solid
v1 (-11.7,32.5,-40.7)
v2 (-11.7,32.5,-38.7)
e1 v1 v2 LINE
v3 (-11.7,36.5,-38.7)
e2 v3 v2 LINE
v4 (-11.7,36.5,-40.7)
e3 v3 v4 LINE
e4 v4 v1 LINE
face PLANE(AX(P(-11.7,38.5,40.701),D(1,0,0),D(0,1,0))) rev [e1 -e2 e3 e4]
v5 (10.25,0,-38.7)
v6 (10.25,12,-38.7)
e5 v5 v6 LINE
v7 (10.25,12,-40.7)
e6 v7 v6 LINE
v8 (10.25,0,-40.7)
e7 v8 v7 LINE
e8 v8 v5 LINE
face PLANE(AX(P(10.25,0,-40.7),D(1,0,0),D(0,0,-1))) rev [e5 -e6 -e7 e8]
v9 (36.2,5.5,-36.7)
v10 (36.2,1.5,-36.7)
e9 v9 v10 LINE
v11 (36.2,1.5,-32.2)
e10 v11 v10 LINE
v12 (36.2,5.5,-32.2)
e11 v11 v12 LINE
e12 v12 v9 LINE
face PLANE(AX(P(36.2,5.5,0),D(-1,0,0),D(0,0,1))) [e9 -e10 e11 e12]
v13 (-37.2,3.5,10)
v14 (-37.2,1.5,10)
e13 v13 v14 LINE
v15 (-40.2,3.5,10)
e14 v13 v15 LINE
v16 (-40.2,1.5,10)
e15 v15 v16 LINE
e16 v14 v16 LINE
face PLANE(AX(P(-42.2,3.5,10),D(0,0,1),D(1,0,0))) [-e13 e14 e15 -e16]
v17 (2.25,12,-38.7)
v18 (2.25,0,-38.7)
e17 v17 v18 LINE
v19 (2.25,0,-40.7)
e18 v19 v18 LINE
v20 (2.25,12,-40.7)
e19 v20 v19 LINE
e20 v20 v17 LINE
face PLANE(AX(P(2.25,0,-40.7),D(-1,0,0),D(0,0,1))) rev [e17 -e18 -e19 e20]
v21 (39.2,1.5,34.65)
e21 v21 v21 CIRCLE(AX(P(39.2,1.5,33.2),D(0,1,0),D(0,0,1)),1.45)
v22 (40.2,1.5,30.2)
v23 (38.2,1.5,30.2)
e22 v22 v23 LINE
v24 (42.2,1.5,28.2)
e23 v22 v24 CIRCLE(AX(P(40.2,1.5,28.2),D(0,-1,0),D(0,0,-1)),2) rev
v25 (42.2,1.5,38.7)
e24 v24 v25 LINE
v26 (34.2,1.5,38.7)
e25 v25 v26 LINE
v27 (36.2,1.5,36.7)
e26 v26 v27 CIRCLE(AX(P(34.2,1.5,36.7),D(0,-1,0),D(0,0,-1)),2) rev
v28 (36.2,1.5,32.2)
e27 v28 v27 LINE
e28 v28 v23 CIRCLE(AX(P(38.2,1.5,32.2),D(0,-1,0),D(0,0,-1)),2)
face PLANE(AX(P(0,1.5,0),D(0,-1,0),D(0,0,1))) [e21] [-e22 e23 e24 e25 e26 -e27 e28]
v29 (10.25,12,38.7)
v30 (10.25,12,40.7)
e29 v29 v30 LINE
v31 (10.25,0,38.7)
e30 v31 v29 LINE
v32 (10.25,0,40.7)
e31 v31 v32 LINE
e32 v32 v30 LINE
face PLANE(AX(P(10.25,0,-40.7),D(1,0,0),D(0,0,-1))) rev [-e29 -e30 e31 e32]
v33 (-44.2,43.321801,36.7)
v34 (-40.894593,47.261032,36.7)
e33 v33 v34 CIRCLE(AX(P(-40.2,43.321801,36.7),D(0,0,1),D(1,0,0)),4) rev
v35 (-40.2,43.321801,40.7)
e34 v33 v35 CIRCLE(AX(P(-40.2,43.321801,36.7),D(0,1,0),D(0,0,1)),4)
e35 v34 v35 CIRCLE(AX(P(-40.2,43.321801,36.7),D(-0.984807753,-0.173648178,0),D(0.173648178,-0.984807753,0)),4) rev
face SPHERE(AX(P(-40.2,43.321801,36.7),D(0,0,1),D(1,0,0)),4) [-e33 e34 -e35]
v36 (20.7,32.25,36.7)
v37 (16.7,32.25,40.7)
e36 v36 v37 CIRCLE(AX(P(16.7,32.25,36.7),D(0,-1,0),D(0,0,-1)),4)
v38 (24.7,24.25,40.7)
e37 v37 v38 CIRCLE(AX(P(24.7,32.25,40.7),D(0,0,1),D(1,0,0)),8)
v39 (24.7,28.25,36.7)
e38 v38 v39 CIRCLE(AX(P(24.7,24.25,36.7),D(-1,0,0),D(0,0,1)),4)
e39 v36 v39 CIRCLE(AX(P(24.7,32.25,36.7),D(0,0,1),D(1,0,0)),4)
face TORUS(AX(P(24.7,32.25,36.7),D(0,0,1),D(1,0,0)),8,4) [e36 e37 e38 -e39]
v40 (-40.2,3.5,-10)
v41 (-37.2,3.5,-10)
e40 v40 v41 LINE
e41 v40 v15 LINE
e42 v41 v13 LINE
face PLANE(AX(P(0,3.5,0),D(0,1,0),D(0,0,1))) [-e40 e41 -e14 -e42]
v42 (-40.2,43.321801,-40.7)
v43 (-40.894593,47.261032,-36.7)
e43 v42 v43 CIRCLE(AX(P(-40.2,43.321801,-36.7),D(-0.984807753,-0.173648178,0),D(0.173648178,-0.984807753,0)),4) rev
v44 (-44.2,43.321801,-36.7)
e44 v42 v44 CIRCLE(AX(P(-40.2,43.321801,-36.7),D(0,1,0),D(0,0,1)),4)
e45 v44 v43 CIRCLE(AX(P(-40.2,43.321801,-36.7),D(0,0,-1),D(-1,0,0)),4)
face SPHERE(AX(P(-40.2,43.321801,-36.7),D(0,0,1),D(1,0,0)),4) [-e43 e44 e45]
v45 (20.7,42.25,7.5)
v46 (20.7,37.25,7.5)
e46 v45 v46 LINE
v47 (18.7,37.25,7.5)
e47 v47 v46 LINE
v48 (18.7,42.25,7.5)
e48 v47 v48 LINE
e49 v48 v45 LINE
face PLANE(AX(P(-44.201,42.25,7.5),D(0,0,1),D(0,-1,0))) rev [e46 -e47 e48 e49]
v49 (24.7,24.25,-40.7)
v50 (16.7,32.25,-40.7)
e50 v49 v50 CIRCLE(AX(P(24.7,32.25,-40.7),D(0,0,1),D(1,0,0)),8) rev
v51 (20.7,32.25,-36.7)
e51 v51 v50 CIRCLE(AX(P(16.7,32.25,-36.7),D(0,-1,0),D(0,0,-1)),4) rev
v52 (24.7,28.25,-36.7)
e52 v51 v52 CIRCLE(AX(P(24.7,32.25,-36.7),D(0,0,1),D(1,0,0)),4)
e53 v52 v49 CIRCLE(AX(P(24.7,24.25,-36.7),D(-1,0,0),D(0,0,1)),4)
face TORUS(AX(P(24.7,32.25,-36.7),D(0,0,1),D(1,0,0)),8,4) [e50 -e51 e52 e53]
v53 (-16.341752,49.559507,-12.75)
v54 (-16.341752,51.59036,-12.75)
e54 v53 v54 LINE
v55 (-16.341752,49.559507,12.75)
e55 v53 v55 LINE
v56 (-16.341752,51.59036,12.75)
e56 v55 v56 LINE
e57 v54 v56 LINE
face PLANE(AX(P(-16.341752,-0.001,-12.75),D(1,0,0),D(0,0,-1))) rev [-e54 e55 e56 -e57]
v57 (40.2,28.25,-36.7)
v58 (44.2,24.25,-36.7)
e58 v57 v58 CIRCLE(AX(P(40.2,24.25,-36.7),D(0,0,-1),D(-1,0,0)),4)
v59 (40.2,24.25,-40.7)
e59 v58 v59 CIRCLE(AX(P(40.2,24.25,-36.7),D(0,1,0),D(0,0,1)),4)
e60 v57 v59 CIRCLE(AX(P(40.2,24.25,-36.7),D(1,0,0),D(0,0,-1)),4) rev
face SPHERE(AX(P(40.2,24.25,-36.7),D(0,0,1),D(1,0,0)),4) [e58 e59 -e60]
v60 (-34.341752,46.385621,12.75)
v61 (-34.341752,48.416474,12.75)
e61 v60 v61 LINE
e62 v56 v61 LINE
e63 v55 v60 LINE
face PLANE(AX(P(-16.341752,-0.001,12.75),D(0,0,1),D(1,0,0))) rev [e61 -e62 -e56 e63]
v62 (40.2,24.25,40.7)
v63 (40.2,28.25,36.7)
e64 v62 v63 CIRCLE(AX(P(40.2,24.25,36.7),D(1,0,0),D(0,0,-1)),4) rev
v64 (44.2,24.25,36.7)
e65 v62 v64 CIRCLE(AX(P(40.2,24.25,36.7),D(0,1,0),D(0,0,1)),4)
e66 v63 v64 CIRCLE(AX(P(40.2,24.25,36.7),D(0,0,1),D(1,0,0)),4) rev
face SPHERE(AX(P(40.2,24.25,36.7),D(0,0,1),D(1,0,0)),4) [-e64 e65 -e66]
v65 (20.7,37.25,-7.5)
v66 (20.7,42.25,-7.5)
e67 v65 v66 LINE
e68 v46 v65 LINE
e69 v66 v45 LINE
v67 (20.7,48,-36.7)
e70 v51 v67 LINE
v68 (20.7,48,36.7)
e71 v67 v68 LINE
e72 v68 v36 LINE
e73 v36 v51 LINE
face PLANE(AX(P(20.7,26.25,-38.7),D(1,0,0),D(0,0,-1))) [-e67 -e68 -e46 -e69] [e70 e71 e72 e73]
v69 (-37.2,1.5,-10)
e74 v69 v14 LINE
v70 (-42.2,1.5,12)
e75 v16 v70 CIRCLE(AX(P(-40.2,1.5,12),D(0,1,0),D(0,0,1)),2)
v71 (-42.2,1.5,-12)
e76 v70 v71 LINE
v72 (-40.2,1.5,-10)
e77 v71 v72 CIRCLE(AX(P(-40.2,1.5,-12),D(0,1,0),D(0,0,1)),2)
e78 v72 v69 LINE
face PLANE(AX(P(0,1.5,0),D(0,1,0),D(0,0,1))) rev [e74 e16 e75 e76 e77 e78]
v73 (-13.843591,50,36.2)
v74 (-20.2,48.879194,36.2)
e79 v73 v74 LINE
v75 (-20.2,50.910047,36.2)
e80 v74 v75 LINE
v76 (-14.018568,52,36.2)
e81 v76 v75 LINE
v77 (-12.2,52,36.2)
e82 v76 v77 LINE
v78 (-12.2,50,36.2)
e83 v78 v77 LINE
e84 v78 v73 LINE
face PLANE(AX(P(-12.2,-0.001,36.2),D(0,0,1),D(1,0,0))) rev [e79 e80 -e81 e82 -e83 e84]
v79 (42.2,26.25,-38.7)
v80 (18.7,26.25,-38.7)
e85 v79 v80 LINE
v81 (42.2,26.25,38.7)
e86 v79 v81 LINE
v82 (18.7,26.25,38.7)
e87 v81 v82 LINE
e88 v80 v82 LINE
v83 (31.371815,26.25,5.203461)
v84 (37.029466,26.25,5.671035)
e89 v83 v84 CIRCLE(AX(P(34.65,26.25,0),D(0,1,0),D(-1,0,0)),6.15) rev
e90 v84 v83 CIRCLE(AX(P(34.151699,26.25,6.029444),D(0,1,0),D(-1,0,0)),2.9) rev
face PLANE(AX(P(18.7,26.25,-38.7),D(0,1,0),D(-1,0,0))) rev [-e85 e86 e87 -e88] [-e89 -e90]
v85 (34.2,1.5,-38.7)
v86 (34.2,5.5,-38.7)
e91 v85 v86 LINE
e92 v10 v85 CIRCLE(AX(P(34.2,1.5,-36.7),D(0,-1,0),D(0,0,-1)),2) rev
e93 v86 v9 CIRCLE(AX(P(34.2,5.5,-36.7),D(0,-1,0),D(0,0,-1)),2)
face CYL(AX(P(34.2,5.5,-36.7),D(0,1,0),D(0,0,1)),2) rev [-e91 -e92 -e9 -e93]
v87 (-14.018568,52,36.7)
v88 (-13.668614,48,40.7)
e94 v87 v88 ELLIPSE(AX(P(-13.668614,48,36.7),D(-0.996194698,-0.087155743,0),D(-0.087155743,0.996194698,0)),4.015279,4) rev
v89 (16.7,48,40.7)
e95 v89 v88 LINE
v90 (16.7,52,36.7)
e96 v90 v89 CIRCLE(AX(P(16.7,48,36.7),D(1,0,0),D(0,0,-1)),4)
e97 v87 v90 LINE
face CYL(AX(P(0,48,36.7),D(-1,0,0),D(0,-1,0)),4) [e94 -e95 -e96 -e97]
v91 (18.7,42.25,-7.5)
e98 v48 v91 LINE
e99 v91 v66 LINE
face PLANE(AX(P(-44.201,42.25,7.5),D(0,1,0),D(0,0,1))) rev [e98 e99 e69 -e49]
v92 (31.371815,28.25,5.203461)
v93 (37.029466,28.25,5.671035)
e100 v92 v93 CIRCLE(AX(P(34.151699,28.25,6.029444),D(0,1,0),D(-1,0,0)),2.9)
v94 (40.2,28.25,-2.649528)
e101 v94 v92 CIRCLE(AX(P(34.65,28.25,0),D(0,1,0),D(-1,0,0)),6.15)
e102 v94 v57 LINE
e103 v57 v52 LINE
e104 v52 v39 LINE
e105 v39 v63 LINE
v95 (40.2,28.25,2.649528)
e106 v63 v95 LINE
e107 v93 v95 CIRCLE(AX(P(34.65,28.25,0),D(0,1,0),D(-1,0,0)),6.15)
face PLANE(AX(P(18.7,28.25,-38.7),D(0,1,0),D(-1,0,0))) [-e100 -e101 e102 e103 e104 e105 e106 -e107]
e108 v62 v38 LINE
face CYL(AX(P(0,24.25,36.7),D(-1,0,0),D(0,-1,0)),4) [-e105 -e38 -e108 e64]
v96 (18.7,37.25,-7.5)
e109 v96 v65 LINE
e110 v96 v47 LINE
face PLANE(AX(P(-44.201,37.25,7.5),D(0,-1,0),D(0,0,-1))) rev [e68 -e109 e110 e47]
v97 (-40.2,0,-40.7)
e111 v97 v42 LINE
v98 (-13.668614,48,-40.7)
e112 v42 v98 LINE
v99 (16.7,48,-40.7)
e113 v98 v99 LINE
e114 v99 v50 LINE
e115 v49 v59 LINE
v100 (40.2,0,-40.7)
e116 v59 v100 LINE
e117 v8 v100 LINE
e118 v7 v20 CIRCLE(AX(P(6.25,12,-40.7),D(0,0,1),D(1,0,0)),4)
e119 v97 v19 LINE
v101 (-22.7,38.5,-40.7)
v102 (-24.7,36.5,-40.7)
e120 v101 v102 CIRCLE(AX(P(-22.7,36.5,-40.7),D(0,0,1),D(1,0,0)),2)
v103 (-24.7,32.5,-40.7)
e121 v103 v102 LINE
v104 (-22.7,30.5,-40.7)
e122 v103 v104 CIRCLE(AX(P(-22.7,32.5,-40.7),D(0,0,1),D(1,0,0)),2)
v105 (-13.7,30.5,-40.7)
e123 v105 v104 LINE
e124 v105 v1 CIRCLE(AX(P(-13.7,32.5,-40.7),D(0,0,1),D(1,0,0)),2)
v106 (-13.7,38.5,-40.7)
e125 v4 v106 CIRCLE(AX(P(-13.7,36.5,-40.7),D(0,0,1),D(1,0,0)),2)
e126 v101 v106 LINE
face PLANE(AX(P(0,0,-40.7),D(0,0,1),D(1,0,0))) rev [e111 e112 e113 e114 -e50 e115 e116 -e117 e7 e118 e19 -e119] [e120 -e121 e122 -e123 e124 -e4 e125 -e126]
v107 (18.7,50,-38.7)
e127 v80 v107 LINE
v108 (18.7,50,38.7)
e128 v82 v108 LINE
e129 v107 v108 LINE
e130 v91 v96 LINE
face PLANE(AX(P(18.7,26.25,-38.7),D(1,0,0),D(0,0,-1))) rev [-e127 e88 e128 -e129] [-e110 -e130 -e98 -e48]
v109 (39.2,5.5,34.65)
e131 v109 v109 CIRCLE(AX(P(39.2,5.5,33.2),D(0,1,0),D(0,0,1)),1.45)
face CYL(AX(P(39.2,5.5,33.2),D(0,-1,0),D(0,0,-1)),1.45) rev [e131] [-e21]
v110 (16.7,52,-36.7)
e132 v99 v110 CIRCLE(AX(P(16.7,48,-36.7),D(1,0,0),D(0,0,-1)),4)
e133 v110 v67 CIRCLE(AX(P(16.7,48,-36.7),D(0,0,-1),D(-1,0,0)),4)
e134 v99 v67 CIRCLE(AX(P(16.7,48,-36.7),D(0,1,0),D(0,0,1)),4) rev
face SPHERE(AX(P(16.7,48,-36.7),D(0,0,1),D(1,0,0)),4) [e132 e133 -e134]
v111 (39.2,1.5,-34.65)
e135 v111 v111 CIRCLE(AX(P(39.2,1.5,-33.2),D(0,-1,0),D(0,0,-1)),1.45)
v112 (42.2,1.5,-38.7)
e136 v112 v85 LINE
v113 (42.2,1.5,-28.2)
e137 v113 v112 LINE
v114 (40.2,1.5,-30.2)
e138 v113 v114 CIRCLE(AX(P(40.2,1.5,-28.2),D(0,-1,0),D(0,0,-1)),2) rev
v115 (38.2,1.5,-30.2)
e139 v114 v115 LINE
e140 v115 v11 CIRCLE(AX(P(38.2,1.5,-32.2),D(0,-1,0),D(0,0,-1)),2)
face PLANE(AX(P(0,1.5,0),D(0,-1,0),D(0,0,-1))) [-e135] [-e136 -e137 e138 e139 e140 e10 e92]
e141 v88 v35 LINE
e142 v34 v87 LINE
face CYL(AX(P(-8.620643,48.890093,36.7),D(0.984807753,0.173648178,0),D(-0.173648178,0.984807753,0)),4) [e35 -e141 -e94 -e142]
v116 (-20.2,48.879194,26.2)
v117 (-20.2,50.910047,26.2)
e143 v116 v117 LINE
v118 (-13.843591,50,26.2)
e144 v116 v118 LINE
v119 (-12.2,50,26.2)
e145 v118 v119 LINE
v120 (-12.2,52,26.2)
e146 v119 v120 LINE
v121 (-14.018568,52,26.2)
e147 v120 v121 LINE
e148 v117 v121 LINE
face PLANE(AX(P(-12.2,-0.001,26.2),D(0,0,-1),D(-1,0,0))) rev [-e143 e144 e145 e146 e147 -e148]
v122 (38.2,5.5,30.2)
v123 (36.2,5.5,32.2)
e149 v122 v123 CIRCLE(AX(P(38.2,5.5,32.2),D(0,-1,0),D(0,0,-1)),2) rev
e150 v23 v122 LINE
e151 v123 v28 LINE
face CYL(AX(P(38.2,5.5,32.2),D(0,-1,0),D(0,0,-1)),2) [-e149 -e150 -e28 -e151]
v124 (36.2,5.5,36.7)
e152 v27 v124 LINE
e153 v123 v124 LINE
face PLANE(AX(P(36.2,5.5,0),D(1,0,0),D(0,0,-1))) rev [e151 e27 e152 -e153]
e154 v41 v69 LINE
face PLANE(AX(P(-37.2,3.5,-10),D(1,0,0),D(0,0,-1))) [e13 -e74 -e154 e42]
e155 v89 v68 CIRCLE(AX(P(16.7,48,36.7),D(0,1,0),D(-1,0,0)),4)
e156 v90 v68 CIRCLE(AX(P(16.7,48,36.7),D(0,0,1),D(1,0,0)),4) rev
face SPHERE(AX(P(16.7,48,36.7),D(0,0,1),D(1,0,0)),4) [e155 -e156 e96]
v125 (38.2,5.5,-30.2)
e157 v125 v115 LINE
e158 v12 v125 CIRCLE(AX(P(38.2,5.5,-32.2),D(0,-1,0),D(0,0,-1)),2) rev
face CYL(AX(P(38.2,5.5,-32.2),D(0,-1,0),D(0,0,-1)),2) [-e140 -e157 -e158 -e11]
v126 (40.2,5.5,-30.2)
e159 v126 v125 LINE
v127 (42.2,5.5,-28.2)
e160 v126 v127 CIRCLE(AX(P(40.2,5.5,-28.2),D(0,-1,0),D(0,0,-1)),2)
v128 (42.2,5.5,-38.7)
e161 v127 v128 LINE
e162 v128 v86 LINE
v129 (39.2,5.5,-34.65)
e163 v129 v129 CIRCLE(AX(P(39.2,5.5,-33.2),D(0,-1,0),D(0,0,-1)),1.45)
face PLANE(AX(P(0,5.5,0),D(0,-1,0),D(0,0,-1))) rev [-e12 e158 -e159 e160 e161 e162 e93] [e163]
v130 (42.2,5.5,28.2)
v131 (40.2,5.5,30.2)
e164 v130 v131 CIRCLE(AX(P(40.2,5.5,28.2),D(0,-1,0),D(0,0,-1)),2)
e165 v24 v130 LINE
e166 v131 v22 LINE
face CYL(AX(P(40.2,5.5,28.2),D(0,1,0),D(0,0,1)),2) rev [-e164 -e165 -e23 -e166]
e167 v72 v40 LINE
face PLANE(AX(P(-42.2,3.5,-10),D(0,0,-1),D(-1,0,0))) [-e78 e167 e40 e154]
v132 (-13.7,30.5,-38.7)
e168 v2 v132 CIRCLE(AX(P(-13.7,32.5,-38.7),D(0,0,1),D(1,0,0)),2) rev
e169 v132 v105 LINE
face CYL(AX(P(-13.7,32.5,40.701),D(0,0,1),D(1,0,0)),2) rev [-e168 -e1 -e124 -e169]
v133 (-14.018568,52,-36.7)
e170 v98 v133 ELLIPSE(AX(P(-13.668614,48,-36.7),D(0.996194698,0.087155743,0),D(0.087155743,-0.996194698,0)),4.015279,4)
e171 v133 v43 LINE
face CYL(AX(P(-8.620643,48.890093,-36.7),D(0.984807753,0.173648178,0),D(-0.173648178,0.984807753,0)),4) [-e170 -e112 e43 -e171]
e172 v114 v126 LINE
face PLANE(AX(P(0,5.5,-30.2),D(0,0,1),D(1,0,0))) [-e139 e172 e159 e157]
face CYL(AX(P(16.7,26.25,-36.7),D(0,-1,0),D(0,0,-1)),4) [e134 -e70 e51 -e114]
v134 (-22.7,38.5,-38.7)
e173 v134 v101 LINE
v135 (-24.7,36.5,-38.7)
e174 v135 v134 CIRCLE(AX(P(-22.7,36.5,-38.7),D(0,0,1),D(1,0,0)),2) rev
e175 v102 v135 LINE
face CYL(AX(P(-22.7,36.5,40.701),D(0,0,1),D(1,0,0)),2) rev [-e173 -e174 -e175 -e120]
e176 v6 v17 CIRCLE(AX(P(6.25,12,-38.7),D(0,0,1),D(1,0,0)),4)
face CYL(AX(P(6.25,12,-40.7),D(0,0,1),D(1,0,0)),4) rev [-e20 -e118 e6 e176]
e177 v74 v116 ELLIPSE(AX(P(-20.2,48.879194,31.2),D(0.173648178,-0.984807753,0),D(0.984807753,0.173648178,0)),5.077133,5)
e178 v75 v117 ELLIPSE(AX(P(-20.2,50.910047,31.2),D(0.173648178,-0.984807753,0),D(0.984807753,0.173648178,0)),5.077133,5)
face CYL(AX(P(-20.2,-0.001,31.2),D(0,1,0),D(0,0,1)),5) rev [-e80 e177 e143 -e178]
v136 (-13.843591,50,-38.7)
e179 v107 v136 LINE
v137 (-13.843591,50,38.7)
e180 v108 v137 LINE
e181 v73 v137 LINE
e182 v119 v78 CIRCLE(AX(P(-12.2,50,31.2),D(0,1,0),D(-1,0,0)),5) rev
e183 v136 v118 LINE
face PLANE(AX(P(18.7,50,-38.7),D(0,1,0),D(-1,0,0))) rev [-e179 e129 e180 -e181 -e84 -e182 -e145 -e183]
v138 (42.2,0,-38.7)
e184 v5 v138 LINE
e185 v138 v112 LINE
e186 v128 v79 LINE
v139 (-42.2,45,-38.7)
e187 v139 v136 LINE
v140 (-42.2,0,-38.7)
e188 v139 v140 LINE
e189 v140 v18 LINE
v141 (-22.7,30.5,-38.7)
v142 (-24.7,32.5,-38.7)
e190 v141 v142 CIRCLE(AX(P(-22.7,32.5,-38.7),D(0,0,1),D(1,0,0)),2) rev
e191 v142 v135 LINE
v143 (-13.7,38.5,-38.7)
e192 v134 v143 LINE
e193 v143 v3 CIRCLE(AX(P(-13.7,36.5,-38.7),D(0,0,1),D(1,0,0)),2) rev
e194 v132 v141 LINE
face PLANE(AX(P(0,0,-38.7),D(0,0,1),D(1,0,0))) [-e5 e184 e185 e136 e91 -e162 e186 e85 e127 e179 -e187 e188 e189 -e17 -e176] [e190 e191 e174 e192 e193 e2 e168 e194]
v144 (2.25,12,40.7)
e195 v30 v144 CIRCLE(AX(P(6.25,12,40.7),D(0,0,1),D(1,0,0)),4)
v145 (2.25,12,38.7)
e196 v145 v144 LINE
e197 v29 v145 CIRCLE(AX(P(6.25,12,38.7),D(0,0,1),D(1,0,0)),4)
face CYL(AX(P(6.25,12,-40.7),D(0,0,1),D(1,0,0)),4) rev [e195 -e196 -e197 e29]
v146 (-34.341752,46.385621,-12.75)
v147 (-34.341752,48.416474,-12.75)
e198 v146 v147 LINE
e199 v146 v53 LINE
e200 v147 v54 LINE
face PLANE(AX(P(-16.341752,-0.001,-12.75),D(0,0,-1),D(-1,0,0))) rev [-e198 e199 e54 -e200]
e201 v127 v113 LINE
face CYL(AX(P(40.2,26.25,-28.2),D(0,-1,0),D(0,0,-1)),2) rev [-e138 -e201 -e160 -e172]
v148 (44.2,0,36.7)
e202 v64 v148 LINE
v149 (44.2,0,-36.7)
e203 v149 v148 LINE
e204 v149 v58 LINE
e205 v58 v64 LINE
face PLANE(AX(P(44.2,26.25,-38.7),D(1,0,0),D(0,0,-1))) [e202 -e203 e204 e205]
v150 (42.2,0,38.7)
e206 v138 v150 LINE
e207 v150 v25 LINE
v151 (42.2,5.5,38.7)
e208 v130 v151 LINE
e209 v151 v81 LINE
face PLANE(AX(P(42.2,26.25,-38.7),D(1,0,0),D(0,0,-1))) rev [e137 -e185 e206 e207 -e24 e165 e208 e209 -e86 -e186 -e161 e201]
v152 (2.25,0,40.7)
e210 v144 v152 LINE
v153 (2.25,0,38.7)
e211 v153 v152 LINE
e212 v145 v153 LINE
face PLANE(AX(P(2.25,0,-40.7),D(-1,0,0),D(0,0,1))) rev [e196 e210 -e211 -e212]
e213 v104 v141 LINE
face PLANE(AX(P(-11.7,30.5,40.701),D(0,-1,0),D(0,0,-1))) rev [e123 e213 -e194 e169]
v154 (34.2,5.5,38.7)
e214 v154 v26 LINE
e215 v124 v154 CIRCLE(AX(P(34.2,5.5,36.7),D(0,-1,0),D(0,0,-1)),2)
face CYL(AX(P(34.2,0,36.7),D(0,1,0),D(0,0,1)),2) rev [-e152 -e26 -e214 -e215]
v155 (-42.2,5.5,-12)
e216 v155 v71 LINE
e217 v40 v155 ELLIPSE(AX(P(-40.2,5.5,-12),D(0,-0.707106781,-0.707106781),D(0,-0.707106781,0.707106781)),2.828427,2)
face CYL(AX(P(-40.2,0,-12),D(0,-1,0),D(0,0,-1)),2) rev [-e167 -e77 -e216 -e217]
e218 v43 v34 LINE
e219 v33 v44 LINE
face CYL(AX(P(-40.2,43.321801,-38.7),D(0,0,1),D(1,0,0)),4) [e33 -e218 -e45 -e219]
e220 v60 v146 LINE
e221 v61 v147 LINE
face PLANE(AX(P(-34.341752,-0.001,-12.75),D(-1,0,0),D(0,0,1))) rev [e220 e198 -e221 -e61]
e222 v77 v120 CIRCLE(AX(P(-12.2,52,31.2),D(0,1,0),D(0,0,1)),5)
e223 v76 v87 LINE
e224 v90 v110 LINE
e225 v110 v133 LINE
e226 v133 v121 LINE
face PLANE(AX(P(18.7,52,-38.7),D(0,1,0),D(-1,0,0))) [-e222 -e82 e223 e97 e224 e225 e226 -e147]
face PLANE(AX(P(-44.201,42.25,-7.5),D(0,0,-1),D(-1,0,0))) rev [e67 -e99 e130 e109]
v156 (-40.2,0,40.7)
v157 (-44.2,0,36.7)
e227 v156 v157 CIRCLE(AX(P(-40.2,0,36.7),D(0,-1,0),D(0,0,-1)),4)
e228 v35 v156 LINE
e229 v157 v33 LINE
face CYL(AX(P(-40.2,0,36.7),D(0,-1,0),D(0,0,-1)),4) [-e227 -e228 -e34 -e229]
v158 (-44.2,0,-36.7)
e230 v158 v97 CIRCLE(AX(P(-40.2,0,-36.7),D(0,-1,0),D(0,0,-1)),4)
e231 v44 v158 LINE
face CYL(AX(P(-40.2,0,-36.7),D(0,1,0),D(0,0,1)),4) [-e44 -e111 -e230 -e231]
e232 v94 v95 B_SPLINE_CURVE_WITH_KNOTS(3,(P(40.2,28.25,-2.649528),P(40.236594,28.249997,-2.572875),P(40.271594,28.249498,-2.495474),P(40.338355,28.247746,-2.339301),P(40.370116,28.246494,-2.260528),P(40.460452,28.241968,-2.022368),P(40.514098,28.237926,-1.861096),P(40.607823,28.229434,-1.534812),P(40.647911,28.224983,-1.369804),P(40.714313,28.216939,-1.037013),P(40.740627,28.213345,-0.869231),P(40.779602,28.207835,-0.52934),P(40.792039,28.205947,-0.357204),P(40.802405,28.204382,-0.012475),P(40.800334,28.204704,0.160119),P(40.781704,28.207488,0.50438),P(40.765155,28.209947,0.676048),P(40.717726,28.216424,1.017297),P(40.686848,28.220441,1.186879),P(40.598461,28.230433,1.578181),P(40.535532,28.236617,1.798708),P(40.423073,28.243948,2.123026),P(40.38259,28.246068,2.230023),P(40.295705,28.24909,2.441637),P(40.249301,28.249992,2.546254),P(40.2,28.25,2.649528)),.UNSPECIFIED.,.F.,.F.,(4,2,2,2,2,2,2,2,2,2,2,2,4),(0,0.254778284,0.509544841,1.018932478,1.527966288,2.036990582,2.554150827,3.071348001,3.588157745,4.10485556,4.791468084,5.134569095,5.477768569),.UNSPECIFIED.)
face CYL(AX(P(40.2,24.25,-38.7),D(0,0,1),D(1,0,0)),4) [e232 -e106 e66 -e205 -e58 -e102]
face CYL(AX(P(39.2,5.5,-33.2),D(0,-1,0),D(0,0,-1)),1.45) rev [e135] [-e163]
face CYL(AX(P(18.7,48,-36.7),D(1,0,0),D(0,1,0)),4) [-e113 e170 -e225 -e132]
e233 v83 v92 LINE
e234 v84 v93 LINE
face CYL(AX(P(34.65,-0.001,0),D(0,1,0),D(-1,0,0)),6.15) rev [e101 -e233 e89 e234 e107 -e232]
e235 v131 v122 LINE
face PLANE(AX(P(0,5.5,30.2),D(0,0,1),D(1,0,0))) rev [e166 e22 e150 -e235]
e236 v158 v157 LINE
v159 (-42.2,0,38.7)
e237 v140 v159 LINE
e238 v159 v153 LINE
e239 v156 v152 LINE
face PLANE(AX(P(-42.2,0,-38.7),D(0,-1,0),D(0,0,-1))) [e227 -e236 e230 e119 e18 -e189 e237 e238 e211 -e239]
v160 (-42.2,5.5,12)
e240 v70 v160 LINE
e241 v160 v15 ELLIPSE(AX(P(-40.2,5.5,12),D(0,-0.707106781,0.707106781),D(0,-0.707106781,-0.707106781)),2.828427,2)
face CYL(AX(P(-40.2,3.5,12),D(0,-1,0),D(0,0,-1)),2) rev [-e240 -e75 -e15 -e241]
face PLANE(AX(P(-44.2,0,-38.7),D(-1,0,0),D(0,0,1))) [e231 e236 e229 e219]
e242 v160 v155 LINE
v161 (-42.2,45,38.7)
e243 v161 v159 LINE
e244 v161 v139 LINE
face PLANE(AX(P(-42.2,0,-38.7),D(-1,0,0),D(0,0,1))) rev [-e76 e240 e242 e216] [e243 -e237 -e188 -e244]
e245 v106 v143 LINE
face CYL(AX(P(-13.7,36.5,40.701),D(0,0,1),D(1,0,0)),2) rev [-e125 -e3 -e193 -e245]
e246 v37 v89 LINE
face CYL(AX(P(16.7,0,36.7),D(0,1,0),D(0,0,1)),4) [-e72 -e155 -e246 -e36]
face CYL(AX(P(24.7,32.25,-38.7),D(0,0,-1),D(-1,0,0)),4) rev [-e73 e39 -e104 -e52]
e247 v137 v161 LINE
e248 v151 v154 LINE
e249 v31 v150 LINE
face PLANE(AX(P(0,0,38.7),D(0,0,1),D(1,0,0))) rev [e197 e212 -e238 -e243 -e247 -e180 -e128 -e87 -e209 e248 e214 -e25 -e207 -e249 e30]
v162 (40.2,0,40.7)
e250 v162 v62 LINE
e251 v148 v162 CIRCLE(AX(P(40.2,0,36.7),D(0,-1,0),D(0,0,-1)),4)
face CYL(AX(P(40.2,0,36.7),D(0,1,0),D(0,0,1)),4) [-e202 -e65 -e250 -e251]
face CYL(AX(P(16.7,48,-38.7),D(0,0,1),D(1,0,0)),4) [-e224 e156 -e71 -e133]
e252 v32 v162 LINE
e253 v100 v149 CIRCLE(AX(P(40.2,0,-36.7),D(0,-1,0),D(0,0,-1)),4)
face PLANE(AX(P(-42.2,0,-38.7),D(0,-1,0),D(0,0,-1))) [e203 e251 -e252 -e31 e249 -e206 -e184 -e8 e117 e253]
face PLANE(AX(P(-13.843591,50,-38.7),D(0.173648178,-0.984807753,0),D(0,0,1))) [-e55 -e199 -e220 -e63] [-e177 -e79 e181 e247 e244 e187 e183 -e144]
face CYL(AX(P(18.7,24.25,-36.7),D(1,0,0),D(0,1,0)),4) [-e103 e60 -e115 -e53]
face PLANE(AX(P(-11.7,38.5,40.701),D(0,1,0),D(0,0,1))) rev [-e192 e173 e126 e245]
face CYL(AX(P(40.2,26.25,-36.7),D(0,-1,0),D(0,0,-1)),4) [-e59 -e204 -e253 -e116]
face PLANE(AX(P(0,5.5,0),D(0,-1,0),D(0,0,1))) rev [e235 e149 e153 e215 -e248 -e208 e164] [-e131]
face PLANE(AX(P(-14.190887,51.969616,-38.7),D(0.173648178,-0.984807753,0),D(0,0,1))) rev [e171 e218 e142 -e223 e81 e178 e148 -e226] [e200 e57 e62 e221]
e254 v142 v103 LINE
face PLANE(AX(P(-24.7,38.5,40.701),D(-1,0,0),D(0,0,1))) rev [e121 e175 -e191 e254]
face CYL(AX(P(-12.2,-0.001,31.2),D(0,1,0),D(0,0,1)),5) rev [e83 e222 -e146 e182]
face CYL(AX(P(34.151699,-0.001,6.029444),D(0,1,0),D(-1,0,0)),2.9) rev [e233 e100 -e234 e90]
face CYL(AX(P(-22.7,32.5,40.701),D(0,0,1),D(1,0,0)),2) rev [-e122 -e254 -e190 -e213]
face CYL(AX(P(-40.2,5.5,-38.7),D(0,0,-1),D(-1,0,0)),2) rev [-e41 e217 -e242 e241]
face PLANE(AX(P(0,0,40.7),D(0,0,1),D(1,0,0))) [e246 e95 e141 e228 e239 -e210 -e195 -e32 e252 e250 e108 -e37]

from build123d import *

# Parameters (mm, degrees)
BOSS_EXTRUDE1_DEPTH      = 38.7
BOSS_EXTRUDE1_DEPTH_BACK = 38.7
CHAMFER1_SIZE            = 5
CHAMFER1_SIZE2           = 28.356409098
SHELL1_T                 = 2
FILLET2_R                = 4
BOSS_EXTRUDE2_START      = -1.5
SKETCH2_W                = 6
SKETCH2_H                = 2.5
SKETCH2_H_2              = 6
SKETCH2_R                = 1.45
BOSS_EXTRUDE2_DEPTH      = 4
FILLET3_R                = 2
CUT_EXTRUDE1_REACH       = 68.394
SKETCH3_R                = 6.15
SKETCH3_R_2              = 2.9
BOSS_EXTRUDE3_START      = -1.5
SKETCH4_W                = 5
SKETCH4_H                = 20
BOSS_EXTRUDE3_DEPTH      = 2
FILLET4_R                = 2
CUT_EXTRUDE2_REACH       = 94.588
SKETCH5_W                = 15
SKETCH5_H                = 5
CUT_EXTRUDE3_DEPTH       = 107.224291049
CUT_EXTRUDE4_REACH       = 92.819
SKETCH7_W                = 18
SKETCH7_H                = 25.5
CUT_EXTRUDE5_REACH       = 81.462
CUT_EXTRUDE6_REACH       = 108.224
SKETCH10_W               = 13
SKETCH10_H               = 8
FILLET5_R                = 2


with BuildPart() as part:
    # Sketch1 → Boss-Extrude1 (new, two sides: drawn at the far end of the back side and taken through both)
    with BuildSketch(Plane.XY.offset(-BOSS_EXTRUDE1_DEPTH_BACK)):
        Polygon((-42.2, 0), (42.2, 0), (42.2, 26.25), (18.7, 26.25), (18.7, 50), (-42.2, 50), align=None)
    extrude(amount=BOSS_EXTRUDE1_DEPTH + BOSS_EXTRUDE1_DEPTH_BACK)

    # Chamfer1
    chamfer1_edges = [part.edges().sort_by_distance(p)[0] for p in [
        (-42.2, 50, 0),
    ]]
    chamfer1_side = [part.faces().sort_by_distance(p)[0] for p in [
        (-42.2, 25, 0),
    ]]
    chamfer(chamfer1_edges, length=CHAMFER1_SIZE, length2=CHAMFER1_SIZE2, reference=chamfer1_side[0])

    # Shell1
    shell1_openings = [part.faces().sort_by_distance(p)[0] for p in [
        (0, 0, 0),
    ]]
    offset(amount=SHELL1_T, openings=shell1_openings, kind=Kind.INTERSECTION)

    # Fillet2
    # the kernel refuses this fillet: 4 mm, written as the material it adds along each edge
    with BuildSketch(Plane(origin=(20.7, 28.25, -40.7), x_dir=(0, 1, 0), z_dir=(0, 0, 1))) as fillet2_piece_1:
        with BuildLine():
            CenterArc((FILLET2_R, -FILLET2_R), FILLET2_R, 90, 90)
            Line((0, -FILLET2_R), (0, 0))
            Line((0, 0), (FILLET2_R, 0))
        make_face()
    extrude(amount=81.4)
    # the kernel refuses this fillet: 4 mm, written as the material it takes off along each edge
    with BuildSketch(Plane(origin=(-40.2, 43.321800738, 36.7), x_dir=(-0.1736481776669273, 0.9848077530122087, 0), z_dir=(0, 0, 1))) as fillet2_2_piece_1_section:
        Polygon((0, 0), (FILLET2_R, 0), (FILLET2_R, FILLET2_R * 0.839099631177), (FILLET2_R * 0.173648177667, FILLET2_R * 0.984807753012), align=None)
    fillet2_2_piece_1 = extrude(amount=FILLET2_R, mode=Mode.PRIVATE)
    fillet2_2_piece_1 = fillet2_2_piece_1 - Plane(origin=(-40.2, 43.321800738, 36.7), x_dir=(0.766044443118977, -0.6427876096865405, 0), z_dir=(0, 0, 1)) * Sphere(FILLET2_R, mode=Mode.PRIVATE)
    add(fillet2_2_piece_1, mode=Mode.SUBTRACT)
    with BuildSketch(Plane(origin=(-40.2, 43.321800738, -36.7), x_dir=(-0.1736481776669273, 0.9848077530122087, 0), z_dir=(0, 0, -1))) as fillet2_2_piece_2_section:
        Polygon((0, 0), (FILLET2_R, 0), (FILLET2_R, -FILLET2_R * 0.839099631177), (FILLET2_R * 0.173648177667, -FILLET2_R * 0.984807753012), align=None)
    fillet2_2_piece_2 = extrude(amount=FILLET2_R, mode=Mode.PRIVATE)
    fillet2_2_piece_2 = fillet2_2_piece_2 - Plane(origin=(-40.2, 43.321800738, -36.7), x_dir=(0.766044443118977, -0.6427876096865405, 0), z_dir=(0, 0, -1)) * Sphere(FILLET2_R, mode=Mode.PRIVATE)
    add(fillet2_2_piece_2, mode=Mode.SUBTRACT)
    with BuildSketch(Plane(origin=(20.7, 52, 50.7), x_dir=(0, -1, 0), z_dir=(0, 0, -1)), Plane(origin=(44.2, 28.25, 50.7), x_dir=(0, -1, 0), z_dir=(0, 0, -1))) as fillet2_2_piece_3:
        with BuildLine():
            CenterArc((FILLET2_R, FILLET2_R), FILLET2_R, 180, 90)
            Line((0, FILLET2_R), (0, 0))
            Line((0, 0), (FILLET2_R, 0))
        make_face()
    extrude(amount=101.4, mode=Mode.SUBTRACT)
    with BuildSketch(Plane(origin=(44.2, 38.25, -40.7), x_dir=(0, 0, 1), z_dir=(0, -1, 0))) as fillet2_2_piece_4:
        with BuildLine():
            CenterArc((FILLET2_R, FILLET2_R), FILLET2_R, 180, 90)
            Line((0, FILLET2_R), (0, 0))
            Line((0, 0), (FILLET2_R, 0))
        make_face()
    extrude(amount=48.25, mode=Mode.SUBTRACT)
    with BuildSketch(Plane(origin=(44.2, -10, 40.7), x_dir=(-1, 0, 0), z_dir=(0, 1, 0))) as fillet2_2_piece_5:
        with BuildLine():
            CenterArc((FILLET2_R, -FILLET2_R), FILLET2_R, 90, 90)
            Line((0, -FILLET2_R), (0, 0))
            Line((0, 0), (FILLET2_R, 0))
        make_face()
    extrude(amount=48.25, mode=Mode.SUBTRACT)
    with BuildSketch(Plane(origin=(30.7, 52, 40.7), x_dir=(0, -1, 0), z_dir=(-1, 0, 0)), Plane(origin=(-24.018568229, 52, -40.7), x_dir=(0, -1, 0), z_dir=(1, 0, 0))) as fillet2_2_piece_6:
        with BuildLine():
            CenterArc((FILLET2_R, -FILLET2_R), FILLET2_R, 90, 90)
            Line((0, -FILLET2_R), (0, 0))
            Line((0, 0), (FILLET2_R, 0))
        make_face()
    extrude(amount=54.718568229, mode=Mode.SUBTRACT)
    with BuildSketch(Plane(origin=(-44.2, 43.321800738, 40.7), x_dir=(0, 0, -1), z_dir=(0, -1, 0)), Plane(origin=(-44.2, -10, -40.7), x_dir=(0, 0, 1), z_dir=(0, 1, 0))) as fillet2_2_piece_7:
        with BuildLine():
            CenterArc((FILLET2_R, FILLET2_R), FILLET2_R, 180, 90)
            Line((0, FILLET2_R), (0, 0))
            Line((0, 0), (FILLET2_R, 0))
        make_face()
    extrude(amount=53.321800738, mode=Mode.SUBTRACT)
    with BuildSketch(Plane(origin=(-4.170490699, 53.736481777, 40.7), x_dir=(0.17364817766692728, -0.9848077530122086, 0), z_dir=(-0.9848077530122087, -0.1736481776669273, 0)), Plane(origin=(-40.894592711, 47.26103175, -40.7), x_dir=(0.1736481776669273, -0.9848077530122087, 1.77635683940025e-15), z_dir=(0.9848077530122087, 0.1736481776669273, 0))) as fillet2_2_piece_8:
        with BuildLine():
            CenterArc((FILLET2_R, -FILLET2_R), FILLET2_R, 90, 90)
            Line((0, -FILLET2_R), (0, 0))
            Line((0, 0), (FILLET2_R, 0))
        make_face()
    extrude(amount=37.29063048, mode=Mode.SUBTRACT)
    with BuildSketch(Plane(origin=(-44.2, 46.678199262, -36.7), x_dir=(0, -1, 0), z_dir=(0, 0, 1))) as fillet2_2_piece_9:
        with BuildLine():
            CenterArc((FILLET2_R * 0.839099631177, FILLET2_R), FILLET2_R, 190, 80)
            Line((-FILLET2_R * 0.145708121835, FILLET2_R * 0.826351822333), (0, 0))
            Line((0, 0), (FILLET2_R * 0.839099631177, 0))
        make_face()
    extrude(amount=73.4, mode=Mode.SUBTRACT)
    # the kernel refuses this fillet: 4 mm, written as the material it takes off along each edge
    with BuildSketch(Plane(origin=(16.7, 48, -36.7), x_dir=(1, 0, 0), z_dir=(0, 0, -1))) as fillet2_3_piece_1_section:
        Polygon((0, 0), (FILLET2_R, 0), (FILLET2_R, -FILLET2_R), (0, -FILLET2_R), align=None)
    fillet2_3_piece_1 = extrude(amount=FILLET2_R, mode=Mode.PRIVATE)
    fillet2_3_piece_1 = fillet2_3_piece_1 - Plane(origin=(16.7, 48, -36.7), x_dir=(-0.7071067811865475, -0.7071067811865476, 0), z_dir=(0, 0, -1)) * Sphere(FILLET2_R, mode=Mode.PRIVATE)
    add(fillet2_3_piece_1, mode=Mode.SUBTRACT)
    with BuildSketch(Plane(origin=(16.7, 48, 36.7), x_dir=(1, 0, 0), z_dir=(0, 0, 1))) as fillet2_3_piece_2_section:
        Polygon((0, 0), (FILLET2_R, 0), (FILLET2_R, FILLET2_R), (0, FILLET2_R), align=None)
    fillet2_3_piece_2 = extrude(amount=FILLET2_R, mode=Mode.PRIVATE)
    fillet2_3_piece_2 = fillet2_3_piece_2 - Plane(origin=(16.7, 48, 36.7), x_dir=(-0.7071067811865475, -0.7071067811865476, 0), z_dir=(0, 0, 1)) * Sphere(FILLET2_R, mode=Mode.PRIVATE)
    add(fillet2_3_piece_2, mode=Mode.SUBTRACT)
    with BuildSketch(Plane(origin=(40.2, 24.25, 36.7), x_dir=(0, 1, 0), z_dir=(0, 0, 1))) as fillet2_3_piece_3_section:
        Polygon((0, 0), (FILLET2_R, 0), (FILLET2_R, -FILLET2_R), (0, -FILLET2_R), align=None)
    fillet2_3_piece_3 = extrude(amount=FILLET2_R, mode=Mode.PRIVATE)
    fillet2_3_piece_3 = fillet2_3_piece_3 - Plane(origin=(40.2, 24.25, 36.7), x_dir=(-0.7071067811865475, -0.7071067811865476, 0), z_dir=(0, 0, 1)) * Sphere(FILLET2_R, mode=Mode.PRIVATE)
    add(fillet2_3_piece_3, mode=Mode.SUBTRACT)
    with BuildSketch(Plane(origin=(40.2, 24.25, -36.7), x_dir=(0, 1, 0), z_dir=(0, 0, -1))) as fillet2_3_piece_4_section:
        Polygon((0, 0), (FILLET2_R, 0), (FILLET2_R, FILLET2_R), (0, FILLET2_R), align=None)
    fillet2_3_piece_4 = extrude(amount=FILLET2_R, mode=Mode.PRIVATE)
    fillet2_3_piece_4 = fillet2_3_piece_4 - Plane(origin=(40.2, 24.25, -36.7), x_dir=(-0.7071067811865475, -0.7071067811865476, 0), z_dir=(0, 0, -1)) * Sphere(FILLET2_R, mode=Mode.PRIVATE)
    add(fillet2_3_piece_4, mode=Mode.SUBTRACT)
    with BuildSketch(Plane(origin=(24.7, 28.25, -40.7), x_dir=(0, -1, 0), z_dir=(1, 0, 0)), Plane(origin=(40.2, 28.25, 40.7), x_dir=(0, -1, 0), z_dir=(-1, 0, 0))) as fillet2_3_piece_5:
        with BuildLine():
            CenterArc((FILLET2_R, -FILLET2_R), FILLET2_R, 90, 90)
            Line((0, -FILLET2_R), (0, 0))
            Line((0, 0), (FILLET2_R, 0))
        make_face()
    extrude(amount=15.5, mode=Mode.SUBTRACT)
    with BuildSketch(Plane(origin=(20.7, 32.25, 40.7), x_dir=(-1, 0, 0), z_dir=(0, 1, 0)), Plane(origin=(20.7, 48, -40.7), x_dir=(-1, 0, 0), z_dir=(0, -1, 0))) as fillet2_3_piece_6:
        with BuildLine():
            CenterArc((FILLET2_R, -FILLET2_R), FILLET2_R, 90, 90)
            Line((0, -FILLET2_R), (0, 0))
            Line((0, 0), (FILLET2_R, 0))
        make_face()
    extrude(amount=15.75, mode=Mode.SUBTRACT)
    with BuildSketch(Plane(origin=(24.7, 32.25, -40.7), x_dir=(-1, 0, 0), z_dir=(0, 1, 0))) as fillet2_3_piece_7:
        with BuildLine():
            CenterArc((4 + FILLET2_R, FILLET2_R), FILLET2_R, 180, 90)
            Line((4, FILLET2_R), (4, 0))
            Line((4, 0), (4 + FILLET2_R, 0))
        make_face()
    revolve(axis=Axis((24.7, 32.25, -40.7), (0, 0, 1)), revolution_arc=90, mode=Mode.SUBTRACT)
    with BuildSketch(Plane(origin=(24.7, 32.25, 40.7), x_dir=(-1, 0, 0), z_dir=(0, 1, 0))) as fillet2_3_piece_8:
        with BuildLine():
            CenterArc((4 + FILLET2_R, -FILLET2_R), FILLET2_R, 90, 90)
            Line((4, -FILLET2_R), (4, 0))
            Line((4, 0), (4 + FILLET2_R, 0))
        make_face()
    revolve(axis=Axis((24.7, 32.25, 40.7), (0, 0, 1)), revolution_arc=90, mode=Mode.SUBTRACT)

    # Sketch2 → Boss-Extrude2 (add)
    # profile 1 of 2: a face of its own
    with BuildSketch(Plane.XZ.offset(BOSS_EXTRUDE2_START)):
        with Locations((39.2, -37.45)):
            Rectangle(SKETCH2_W, SKETCH2_H)
    # profile 2 of 2: a face of its own
    with BuildSketch(Plane.XZ.offset(BOSS_EXTRUDE2_START)):
        with Locations((39.2, -33.2)):
            Rectangle(SKETCH2_W, SKETCH2_H_2)
        with Locations(Location((39.2, -33.2, 0), (0, 0, 270))):
            Circle(SKETCH2_R, mode=Mode.SUBTRACT)
    boss_extrude2 = extrude(amount=-BOSS_EXTRUDE2_DEPTH)

    # Mirror1: Boss-Extrude2 across plane
    add(boss_extrude2.mirror(Plane.XY))

    # Fillet3
    fillet3_edges = [part.edges().sort_by_distance(p)[0] for p in [
        (42.2, 3.5, -30.2),
        (36.2, 3.5, -38.7),
        (36.2, 3.5, -30.2),
        (42.2, 3.5, 30.2),
        (36.2, 3.5, 30.2),
        (36.2, 3.5, 38.7),
    ]]
    fillet(fillet3_edges, radius=FILLET3_R)

    # Sketch3 → Cut-Extrude1 (cut, up to next)
    with BuildSketch(Plane(origin=(0, 28.25, 0), x_dir=(1, 0, 0), z_dir=(0, 1, 0)), mode=Mode.PRIVATE) as cut_extrude1_sk1:
        with Locations((34.65, 0)):
            Circle(SKETCH3_R)
    cut_extrude1_tool1 = extrude(cut_extrude1_sk1.sketch, amount=-CUT_EXTRUDE1_REACH, mode=Mode.PRIVATE) & part.part
    # Sketch3 → Cut-Extrude1 (cut, up to next)
    with BuildSketch(Plane(origin=(0, 28.25, 0), x_dir=(1, 0, 0), z_dir=(0, 1, 0)), mode=Mode.PRIVATE) as cut_extrude1_sk2:
        with Locations((34.151698836, -6.029444083)):
            Circle(SKETCH3_R_2)
    cut_extrude1_tool2 = extrude(cut_extrude1_sk2.sketch, amount=-CUT_EXTRUDE1_REACH, mode=Mode.PRIVATE) & part.part
    add(cut_extrude1_tool1.solids().sort_by_distance((34.65, 28.25, 0))[0], mode=Mode.SUBTRACT)
    add(cut_extrude1_tool2.solids().sort_by_distance((34.151699, 28.25, 6.029444))[0], mode=Mode.SUBTRACT)

    # Sketch4 → Boss-Extrude3 (add)
    with BuildSketch(Plane.XZ.offset(BOSS_EXTRUDE3_START)):
        with Locations((-39.7, 0)):
            Rectangle(SKETCH4_W, SKETCH4_H)
    extrude(amount=-BOSS_EXTRUDE3_DEPTH)

    # Fillet4
    fillet4_edges = [part.edges().sort_by_distance(p)[0] for p in [
        (-42.2, 3.5, 0),
        (-42.2, 2.5, -10),
        (-42.2, 2.5, 10),
    ]]
    fillet(fillet4_edges, radius=FILLET4_R)

    # Sketch5 → Cut-Extrude2 (cut, up to next)
    with BuildSketch(Plane(origin=(20.7, 0, 0), x_dir=(0, 0, -1), z_dir=(1, 0, 0)), mode=Mode.PRIVATE) as cut_extrude2_sk1:
        with Locations((0, 39.75)):
            Rectangle(SKETCH5_W, SKETCH5_H)
    cut_extrude2_tool1 = extrude(cut_extrude2_sk1.sketch, amount=-CUT_EXTRUDE2_REACH, mode=Mode.PRIVATE) & part.part
    add(cut_extrude2_tool1.solids().sort_by_distance((20.7, 39.75, 0))[0], mode=Mode.SUBTRACT)

    # Sketch6 → Cut-Extrude3 (cut, through all)
    with BuildSketch(Plane.XY.offset(40.7)):
        with BuildLine():
            Line((2.25, 0), (2.25, 12))
            ThreePointArc((2.25, 12), (6.25, 16), (10.25, 12))
            Line((10.25, 12), (10.25, 0))
            ThreePointArc((10.25, 0), (6.25, -4), (2.25, 0))
        make_face()
    extrude(amount=-CUT_EXTRUDE3_DEPTH, mode=Mode.SUBTRACT)

    # Cut-Extrude4: up to this plane
    cut_extrude4_end = Plane(origin=(-13.843590902, 50, -38.7), z_dir=(0.17364817766693147, -0.9848077530122079, 0))
    # Sketch7 → Cut-Extrude4 (cut, up to the surface)
    with BuildSketch(Plane(origin=(-18.150298314, 52, 0), x_dir=(1, 0, 0), z_dir=(0, 1, 0)), mode=Mode.PRIVATE) as cut_extrude4_sk1:
        with Locations((-7.191454162, 0)):
            Rectangle(SKETCH7_W, SKETCH7_H)
    cut_extrude4_tool1 = split(extrude(cut_extrude4_sk1.sketch, amount=-CUT_EXTRUDE4_REACH, mode=Mode.PRIVATE), bisect_by=cut_extrude4_end, keep=Keep.BOTH, mode=Mode.PRIVATE)
    add(cut_extrude4_tool1.solids().sort_by_distance((-25.341752, 52, 0))[0], mode=Mode.SUBTRACT)

    # Sketch8 → Cut-Extrude5 (cut, up to next)
    with BuildSketch(Plane(origin=(0, 52, 0), x_dir=(1, 0, 0), z_dir=(0, 1, 0)), mode=Mode.PRIVATE) as cut_extrude5_sk1:
        with BuildLine():
            Line((-12.2, -36.2), (-20.2, -36.2))
            ThreePointArc((-20.2, -36.2), (-25.2, -31.2), (-20.2, -26.2))
            Line((-20.2, -26.2), (-12.2, -26.2))
            ThreePointArc((-12.2, -26.2), (-7.2, -31.2), (-12.2, -36.2))
        make_face()
    cut_extrude5_tool1 = extrude(cut_extrude5_sk1.sketch, amount=-CUT_EXTRUDE5_REACH, mode=Mode.PRIVATE) & part.part
    add(cut_extrude5_tool1.solids().sort_by_distance((-16.2, 52, 31.2))[0], mode=Mode.SUBTRACT)

    # Sketch10 → Cut-Extrude6 (cut, up to next)
    with BuildSketch(Plane(origin=(0, 0, -40.7), x_dir=(-1, 0, 0), z_dir=(0, 0, -1)), mode=Mode.PRIVATE) as cut_extrude6_sk1:
        with Locations((18.2, 34.5)):
            Rectangle(SKETCH10_W, SKETCH10_H)
    cut_extrude6_tool1 = extrude(cut_extrude6_sk1.sketch, amount=-CUT_EXTRUDE6_REACH, mode=Mode.PRIVATE) & part.part
    add(cut_extrude6_tool1.solids().sort_by_distance((-18.2, 34.5, -40.7))[0], mode=Mode.SUBTRACT)

    # Fillet5
    fillet5_edges = [part.edges().sort_by_distance(p)[0] for p in [
        (-24.7, 38.5, -39.7),
        (-24.7, 30.5, -39.7),
        (-11.7, 30.5, -39.7),
        (-11.7, 38.5, -39.7),
    ]]
    fillet(fillet5_edges, radius=FILLET5_R)


solid = part.part
